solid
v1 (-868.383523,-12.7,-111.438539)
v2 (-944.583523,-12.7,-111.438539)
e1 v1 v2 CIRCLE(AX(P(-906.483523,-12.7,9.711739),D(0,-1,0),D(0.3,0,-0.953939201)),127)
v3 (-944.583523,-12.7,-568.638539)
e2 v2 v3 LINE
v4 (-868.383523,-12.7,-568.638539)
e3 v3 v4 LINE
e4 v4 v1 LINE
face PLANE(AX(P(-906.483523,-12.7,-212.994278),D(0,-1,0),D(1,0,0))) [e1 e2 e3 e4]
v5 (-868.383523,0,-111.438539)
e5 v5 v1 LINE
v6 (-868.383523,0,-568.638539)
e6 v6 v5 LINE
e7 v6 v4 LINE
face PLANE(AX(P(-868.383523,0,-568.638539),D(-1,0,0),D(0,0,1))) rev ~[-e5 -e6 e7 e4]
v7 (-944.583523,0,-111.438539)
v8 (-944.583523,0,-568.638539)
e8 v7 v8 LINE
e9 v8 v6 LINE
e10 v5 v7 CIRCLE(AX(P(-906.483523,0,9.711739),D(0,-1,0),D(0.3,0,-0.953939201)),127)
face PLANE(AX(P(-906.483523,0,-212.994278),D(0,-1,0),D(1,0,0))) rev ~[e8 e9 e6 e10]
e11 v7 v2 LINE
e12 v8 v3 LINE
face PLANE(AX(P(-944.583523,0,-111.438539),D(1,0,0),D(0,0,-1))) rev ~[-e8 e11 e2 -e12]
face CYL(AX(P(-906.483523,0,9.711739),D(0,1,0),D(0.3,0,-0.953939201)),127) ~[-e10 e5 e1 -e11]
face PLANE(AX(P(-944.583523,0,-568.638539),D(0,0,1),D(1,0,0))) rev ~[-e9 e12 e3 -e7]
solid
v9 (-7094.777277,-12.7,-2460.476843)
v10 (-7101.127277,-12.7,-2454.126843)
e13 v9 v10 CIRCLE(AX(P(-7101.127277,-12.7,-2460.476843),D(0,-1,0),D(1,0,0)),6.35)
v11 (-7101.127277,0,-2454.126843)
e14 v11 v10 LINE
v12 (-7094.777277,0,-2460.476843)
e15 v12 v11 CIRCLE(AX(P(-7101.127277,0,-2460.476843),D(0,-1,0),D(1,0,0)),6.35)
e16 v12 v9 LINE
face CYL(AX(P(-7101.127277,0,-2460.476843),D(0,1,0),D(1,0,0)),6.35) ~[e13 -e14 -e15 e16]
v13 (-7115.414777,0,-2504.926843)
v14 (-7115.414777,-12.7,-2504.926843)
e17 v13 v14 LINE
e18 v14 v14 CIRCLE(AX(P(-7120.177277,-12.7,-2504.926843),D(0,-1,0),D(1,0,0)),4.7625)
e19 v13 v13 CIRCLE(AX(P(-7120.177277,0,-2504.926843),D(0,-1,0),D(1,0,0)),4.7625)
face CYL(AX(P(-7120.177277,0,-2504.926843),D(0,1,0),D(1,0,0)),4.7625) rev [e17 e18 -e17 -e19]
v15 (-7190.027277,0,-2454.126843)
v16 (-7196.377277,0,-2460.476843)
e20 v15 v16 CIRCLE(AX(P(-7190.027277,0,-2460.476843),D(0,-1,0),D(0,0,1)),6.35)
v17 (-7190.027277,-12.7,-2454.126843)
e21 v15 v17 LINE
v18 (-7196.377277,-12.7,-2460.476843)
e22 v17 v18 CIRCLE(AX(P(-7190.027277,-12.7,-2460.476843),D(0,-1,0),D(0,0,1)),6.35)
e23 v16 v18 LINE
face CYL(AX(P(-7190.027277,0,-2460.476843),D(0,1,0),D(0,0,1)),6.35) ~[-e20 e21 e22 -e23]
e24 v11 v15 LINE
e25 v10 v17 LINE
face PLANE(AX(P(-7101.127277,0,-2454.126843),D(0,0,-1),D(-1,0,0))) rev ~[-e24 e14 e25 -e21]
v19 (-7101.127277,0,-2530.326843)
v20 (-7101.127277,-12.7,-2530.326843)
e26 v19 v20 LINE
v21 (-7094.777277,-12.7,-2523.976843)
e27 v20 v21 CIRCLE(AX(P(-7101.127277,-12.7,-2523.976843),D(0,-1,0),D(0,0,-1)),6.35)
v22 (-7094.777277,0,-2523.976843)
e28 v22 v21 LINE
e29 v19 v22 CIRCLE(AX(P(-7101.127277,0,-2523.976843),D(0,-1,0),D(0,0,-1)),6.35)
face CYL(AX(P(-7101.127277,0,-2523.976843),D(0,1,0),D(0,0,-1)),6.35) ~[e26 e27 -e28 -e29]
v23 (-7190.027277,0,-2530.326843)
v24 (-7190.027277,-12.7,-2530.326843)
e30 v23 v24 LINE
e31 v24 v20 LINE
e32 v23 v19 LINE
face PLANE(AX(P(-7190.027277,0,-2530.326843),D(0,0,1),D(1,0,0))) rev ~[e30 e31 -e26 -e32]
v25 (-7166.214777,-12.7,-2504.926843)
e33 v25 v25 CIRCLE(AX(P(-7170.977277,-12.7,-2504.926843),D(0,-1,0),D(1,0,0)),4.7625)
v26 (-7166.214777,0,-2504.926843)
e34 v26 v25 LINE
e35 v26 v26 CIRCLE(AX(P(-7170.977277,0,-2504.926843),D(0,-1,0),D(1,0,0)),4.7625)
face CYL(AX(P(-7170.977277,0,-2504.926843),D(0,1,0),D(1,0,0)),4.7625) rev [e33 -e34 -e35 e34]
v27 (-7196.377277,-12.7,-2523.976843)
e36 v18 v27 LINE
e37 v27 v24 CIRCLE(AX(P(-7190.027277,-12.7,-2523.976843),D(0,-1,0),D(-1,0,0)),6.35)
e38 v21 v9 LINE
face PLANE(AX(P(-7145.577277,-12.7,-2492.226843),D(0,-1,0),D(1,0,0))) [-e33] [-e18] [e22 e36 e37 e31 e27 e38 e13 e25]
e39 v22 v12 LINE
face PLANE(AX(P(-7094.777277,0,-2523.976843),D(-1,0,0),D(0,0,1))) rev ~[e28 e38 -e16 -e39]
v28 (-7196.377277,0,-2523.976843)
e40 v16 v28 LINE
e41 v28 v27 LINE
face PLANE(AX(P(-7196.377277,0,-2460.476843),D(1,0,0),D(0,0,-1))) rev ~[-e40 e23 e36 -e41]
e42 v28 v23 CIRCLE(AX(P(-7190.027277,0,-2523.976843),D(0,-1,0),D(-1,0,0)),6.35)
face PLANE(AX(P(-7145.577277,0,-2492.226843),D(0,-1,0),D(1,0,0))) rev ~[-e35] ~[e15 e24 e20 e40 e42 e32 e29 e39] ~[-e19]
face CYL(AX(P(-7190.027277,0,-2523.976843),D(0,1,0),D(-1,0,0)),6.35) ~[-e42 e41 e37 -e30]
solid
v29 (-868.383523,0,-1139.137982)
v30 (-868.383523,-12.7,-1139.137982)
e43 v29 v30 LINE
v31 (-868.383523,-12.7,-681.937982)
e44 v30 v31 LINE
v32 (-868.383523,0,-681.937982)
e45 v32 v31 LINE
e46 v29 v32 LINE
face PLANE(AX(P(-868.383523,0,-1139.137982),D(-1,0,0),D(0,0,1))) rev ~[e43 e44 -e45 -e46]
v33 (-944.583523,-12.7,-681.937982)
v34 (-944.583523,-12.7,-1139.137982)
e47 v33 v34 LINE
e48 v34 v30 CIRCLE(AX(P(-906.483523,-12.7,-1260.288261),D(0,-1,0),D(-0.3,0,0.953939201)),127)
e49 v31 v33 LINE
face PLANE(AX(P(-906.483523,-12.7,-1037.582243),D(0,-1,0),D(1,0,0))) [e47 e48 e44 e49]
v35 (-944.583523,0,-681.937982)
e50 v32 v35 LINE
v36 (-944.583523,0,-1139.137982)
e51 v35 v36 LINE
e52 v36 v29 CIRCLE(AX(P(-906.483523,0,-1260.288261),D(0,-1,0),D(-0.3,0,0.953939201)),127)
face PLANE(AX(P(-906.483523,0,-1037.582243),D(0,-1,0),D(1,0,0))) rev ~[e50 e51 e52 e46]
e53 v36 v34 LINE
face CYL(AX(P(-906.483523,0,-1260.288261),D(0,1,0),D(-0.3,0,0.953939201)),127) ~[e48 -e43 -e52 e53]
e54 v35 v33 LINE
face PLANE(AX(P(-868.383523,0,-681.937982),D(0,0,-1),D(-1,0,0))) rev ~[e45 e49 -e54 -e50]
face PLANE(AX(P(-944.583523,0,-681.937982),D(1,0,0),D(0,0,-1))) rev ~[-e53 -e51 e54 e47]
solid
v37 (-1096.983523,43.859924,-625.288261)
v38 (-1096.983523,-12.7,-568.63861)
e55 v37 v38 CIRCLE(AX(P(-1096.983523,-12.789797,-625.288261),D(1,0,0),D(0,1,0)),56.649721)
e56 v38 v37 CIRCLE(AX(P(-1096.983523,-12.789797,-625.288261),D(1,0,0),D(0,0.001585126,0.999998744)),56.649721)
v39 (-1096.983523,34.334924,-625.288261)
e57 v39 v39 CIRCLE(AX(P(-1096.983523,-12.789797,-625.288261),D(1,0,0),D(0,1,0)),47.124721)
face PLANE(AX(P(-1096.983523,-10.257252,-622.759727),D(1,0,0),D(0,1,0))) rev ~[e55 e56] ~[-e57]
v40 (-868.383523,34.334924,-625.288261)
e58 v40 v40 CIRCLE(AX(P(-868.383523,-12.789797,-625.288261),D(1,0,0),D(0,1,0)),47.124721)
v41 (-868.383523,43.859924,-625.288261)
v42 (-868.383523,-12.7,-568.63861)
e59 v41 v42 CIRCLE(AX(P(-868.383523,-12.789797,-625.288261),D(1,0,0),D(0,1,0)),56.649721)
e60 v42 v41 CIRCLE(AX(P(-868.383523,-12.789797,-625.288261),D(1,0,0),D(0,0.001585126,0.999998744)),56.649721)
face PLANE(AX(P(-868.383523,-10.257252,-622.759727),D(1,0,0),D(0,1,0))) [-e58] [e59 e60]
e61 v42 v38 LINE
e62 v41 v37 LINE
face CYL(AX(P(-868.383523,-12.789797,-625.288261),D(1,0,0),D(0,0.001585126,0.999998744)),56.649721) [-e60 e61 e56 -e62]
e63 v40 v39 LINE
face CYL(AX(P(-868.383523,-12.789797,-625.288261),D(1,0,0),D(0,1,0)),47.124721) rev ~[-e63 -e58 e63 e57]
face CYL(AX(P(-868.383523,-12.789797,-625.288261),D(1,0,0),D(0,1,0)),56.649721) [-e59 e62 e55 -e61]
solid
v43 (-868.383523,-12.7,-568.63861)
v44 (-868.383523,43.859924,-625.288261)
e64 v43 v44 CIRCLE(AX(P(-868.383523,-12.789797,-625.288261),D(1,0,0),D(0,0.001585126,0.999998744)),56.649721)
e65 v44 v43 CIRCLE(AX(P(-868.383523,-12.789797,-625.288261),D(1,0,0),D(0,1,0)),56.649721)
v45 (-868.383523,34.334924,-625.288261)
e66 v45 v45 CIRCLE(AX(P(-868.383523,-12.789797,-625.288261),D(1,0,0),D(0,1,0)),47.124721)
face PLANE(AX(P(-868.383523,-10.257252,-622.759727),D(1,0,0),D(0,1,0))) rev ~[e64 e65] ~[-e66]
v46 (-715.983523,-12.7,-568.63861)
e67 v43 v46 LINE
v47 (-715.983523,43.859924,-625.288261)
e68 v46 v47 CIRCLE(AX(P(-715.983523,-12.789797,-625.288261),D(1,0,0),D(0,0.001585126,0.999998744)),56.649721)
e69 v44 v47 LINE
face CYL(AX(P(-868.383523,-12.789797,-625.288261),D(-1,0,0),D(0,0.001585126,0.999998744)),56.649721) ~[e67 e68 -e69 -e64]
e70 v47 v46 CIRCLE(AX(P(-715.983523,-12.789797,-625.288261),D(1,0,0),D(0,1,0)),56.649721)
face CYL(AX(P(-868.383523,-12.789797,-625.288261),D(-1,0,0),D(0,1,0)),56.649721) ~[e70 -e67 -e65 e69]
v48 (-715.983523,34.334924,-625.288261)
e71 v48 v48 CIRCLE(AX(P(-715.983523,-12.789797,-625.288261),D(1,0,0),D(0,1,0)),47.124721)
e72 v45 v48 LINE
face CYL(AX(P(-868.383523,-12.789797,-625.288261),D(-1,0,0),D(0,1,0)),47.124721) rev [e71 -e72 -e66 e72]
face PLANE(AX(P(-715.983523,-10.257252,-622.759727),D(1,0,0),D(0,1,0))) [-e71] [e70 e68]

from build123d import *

# Parameters (mm, degrees)
F1_DEPTH = 12.7
F0_R     = 4.7625
F2_R     = 47.12472142
F3_DEPTH = 152.4
F4_DEPTH = 228.6


# Not quite as in the source:
# - a feature names something its author has since deleted; it is built from what else it names


with BuildPart() as f1:
    # F0 (on Front) → F1 (new body)
    with BuildSketch(Plane.XZ):
        with BuildLine():
            Line((-868.383522886, -568.6385392112), (-868.383522886, -111.4385392112))
            ThreePointArc((-868.383522886, -111.4385392112), (-906.483522886, 136.7117393687), (-944.583522886, -111.4385392112))
            Line((-944.583522886, -111.4385392112), (-944.583522886, -568.6385392112))
            Line((-944.583522886, -568.6385392112), (-868.383522886, -568.6385392112))
        make_face()
    extrude(amount=F1_DEPTH)


with BuildPart() as f1b:
    # F0 (on Front) → F1, piece 2 (new body)
    with BuildSketch(Plane.XZ):
        with BuildLine():
            Line((-944.583522886, -681.9379820513), (-944.583522886, -1139.1379820513))
            ThreePointArc((-944.583522886, -1139.1379820513), (-906.483522886, -1387.2882606313), (-868.383522886, -1139.1379820513))
            Line((-868.383522886, -1139.1379820513), (-868.383522886, -681.9379820513))
            Line((-868.383522886, -681.9379820513), (-944.583522886, -681.9379820513))
        make_face()
    extrude(amount=F1_DEPTH)


with BuildPart() as f1c:
    # F0 (on Front) → F1, piece 3 (new body)
    with BuildSketch(Plane.XZ):
        with BuildLine():
            Line((-7101.1272773743, -2454.1268432617), (-7190.0272773743, -2454.1268432617))
            ThreePointArc((-7190.0272773743, -2454.1268432617), (-7194.5174054348, -2455.9867152012), (-7196.3772773743, -2460.4768432617))
            Line((-7196.3772773743, -2460.4768432617), (-7196.3772773743, -2523.9768432617))
            ThreePointArc((-7196.3772773743, -2523.9768432617), (-7194.5174054348, -2528.4669713223), (-7190.0272773743, -2530.3268432617))
            Line((-7190.0272773743, -2530.3268432617), (-7101.1272773743, -2530.3268432617))
            ThreePointArc((-7101.1272773743, -2530.3268432617), (-7096.6371493137, -2528.4669713223), (-7094.7772773743, -2523.9768432617))
            Line((-7094.7772773743, -2523.9768432617), (-7094.7772773743, -2460.4768432617))
            ThreePointArc((-7094.7772773743, -2460.4768432617), (-7096.6371493137, -2455.9867152012), (-7101.1272773743, -2454.1268432617))
        make_face()
        with Locations((-7170.9772773743, -2504.9268432617)):
            Circle(F0_R, mode=Mode.SUBTRACT)
        with Locations((-7120.1772773743, -2504.9268432617)):
            Circle(F0_R, mode=Mode.SUBTRACT)
    extrude(amount=F1_DEPTH)


with BuildPart() as f3:
    # F2 (on face) → F3 (new body)
    with BuildSketch(Plane.YZ.offset(-868.383522886)):
        with BuildLine():
            ThreePointArc((-12.7000001128, -568.638610381), (-52.8789346424, -665.3139022013), (43.8599243822, -625.2882606313))
            ThreePointArc((43.8599243822, -625.2882606313), (27.2993405667, -585.2626190613), (-12.7000001128, -568.638610381))
        make_face()
        with Locations((-12.7897970378, -625.2882606313)):
            Circle(F2_R, mode=Mode.SUBTRACT)
    extrude(amount=F3_DEPTH)


with BuildPart() as f4:
    # F4 (new): a face of the model
    f4_faces = [f3.part.faces().sort_by_distance(p)[0] for p in [
        (-868.383522886, -67.8372223712, -625.2882606313),
    ]]
    extrude(f4_faces, amount=F4_DEPTH)


solid = Compound([f1.part, f1b.part, f1c.part, f3.part, f4.part])
